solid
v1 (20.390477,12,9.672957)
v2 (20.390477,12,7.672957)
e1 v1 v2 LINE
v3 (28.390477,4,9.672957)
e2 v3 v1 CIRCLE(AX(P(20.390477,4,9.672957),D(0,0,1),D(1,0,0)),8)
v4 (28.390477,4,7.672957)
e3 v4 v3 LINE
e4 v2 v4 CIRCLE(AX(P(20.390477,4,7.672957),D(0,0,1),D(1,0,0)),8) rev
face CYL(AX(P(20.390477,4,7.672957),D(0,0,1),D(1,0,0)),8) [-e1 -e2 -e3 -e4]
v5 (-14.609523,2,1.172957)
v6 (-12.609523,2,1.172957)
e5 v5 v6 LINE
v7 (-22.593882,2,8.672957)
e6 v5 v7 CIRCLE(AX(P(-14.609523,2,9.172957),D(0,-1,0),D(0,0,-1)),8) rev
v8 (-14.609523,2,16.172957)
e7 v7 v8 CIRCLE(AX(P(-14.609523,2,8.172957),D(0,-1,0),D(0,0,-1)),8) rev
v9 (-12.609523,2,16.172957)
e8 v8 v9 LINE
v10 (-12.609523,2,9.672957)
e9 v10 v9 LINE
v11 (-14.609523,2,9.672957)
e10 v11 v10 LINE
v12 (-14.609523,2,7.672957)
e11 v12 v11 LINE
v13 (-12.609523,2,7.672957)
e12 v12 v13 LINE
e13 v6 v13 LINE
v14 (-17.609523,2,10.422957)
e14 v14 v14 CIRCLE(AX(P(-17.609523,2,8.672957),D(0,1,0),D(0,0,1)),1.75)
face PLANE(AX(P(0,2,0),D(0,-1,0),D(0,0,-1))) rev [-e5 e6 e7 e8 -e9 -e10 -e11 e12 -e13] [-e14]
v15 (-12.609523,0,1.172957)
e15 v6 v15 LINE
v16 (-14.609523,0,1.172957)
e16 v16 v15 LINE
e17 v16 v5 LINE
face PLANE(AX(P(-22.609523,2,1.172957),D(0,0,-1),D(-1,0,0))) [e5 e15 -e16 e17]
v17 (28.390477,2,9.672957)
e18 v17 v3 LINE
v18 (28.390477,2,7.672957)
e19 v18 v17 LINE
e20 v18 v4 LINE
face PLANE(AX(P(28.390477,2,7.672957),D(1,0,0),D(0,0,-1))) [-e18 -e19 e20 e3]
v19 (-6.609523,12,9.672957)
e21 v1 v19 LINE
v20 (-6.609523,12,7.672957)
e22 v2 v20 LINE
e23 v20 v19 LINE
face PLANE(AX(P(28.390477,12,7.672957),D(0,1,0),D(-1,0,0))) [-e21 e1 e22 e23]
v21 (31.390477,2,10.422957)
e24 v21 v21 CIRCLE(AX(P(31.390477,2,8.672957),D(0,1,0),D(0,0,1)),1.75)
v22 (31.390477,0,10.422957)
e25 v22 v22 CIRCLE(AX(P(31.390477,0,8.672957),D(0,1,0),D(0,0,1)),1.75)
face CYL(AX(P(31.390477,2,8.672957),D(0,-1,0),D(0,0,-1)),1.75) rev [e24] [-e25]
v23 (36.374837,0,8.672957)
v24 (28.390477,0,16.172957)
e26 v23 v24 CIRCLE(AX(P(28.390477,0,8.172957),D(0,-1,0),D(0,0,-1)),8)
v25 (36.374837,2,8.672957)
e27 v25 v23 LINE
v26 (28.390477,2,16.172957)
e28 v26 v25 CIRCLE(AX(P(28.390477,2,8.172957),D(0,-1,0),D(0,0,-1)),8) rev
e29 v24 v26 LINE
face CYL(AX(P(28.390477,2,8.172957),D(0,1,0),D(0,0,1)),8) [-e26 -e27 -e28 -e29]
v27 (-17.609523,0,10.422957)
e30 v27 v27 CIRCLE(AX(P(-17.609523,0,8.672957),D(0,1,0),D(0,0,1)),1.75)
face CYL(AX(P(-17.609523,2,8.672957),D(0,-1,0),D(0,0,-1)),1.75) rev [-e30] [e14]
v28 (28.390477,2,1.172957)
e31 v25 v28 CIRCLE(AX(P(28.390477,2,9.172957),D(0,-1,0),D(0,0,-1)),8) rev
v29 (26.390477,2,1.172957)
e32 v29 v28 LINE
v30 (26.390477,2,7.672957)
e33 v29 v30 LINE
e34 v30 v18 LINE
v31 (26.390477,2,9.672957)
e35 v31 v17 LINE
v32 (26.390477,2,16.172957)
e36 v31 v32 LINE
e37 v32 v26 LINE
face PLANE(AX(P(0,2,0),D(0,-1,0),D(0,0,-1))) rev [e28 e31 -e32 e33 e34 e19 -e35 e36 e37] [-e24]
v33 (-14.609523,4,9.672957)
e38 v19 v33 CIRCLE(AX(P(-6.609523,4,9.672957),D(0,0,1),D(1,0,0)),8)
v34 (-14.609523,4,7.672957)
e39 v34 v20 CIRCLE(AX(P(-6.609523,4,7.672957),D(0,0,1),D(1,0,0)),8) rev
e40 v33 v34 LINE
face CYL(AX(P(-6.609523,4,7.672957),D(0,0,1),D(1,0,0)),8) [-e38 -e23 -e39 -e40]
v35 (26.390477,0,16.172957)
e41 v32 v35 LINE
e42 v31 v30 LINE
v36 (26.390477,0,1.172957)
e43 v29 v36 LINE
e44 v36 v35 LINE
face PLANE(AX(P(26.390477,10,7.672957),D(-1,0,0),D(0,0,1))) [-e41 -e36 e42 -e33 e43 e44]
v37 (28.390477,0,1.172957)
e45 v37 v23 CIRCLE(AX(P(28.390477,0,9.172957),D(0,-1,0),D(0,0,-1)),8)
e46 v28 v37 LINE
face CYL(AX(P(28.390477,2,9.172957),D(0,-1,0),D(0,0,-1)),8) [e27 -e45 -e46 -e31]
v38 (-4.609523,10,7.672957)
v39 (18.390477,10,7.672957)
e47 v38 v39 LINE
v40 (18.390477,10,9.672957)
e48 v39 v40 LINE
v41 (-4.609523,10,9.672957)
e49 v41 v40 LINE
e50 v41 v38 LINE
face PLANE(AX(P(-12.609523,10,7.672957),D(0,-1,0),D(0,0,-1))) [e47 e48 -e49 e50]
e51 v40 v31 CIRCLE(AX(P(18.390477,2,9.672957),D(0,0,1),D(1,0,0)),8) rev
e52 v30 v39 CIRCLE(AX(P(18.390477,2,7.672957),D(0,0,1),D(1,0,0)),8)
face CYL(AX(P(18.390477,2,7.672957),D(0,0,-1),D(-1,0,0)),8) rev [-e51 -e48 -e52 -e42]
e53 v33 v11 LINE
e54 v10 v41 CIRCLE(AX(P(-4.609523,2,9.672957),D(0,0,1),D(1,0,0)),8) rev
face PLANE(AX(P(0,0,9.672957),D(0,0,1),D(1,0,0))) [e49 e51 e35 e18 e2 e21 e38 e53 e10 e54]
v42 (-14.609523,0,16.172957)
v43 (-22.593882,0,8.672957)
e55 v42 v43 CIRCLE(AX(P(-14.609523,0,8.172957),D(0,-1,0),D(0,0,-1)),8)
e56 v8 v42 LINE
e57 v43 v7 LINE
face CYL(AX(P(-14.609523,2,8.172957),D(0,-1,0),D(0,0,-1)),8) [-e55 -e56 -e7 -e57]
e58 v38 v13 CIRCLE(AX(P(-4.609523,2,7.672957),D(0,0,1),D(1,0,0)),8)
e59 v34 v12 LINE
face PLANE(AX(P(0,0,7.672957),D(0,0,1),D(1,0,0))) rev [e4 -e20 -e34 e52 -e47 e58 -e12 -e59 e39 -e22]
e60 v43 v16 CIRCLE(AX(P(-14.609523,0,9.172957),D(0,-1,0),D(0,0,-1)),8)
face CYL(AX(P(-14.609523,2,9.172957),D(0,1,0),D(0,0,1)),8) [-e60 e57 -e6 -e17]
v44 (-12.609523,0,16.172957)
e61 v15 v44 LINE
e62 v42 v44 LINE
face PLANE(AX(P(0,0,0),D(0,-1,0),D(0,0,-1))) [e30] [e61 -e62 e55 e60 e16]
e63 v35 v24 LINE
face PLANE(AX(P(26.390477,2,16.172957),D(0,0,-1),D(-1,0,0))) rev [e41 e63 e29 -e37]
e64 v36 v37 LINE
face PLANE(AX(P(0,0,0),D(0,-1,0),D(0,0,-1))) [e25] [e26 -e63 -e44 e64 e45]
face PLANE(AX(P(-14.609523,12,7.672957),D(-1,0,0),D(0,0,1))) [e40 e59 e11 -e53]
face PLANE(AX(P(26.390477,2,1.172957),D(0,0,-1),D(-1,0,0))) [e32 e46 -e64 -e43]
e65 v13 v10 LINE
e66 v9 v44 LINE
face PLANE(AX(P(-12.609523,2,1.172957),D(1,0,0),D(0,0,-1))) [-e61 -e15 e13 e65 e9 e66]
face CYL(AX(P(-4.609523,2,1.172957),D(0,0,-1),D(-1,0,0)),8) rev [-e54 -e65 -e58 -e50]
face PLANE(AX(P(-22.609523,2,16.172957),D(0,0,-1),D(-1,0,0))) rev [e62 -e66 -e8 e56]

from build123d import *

# Parameters (mm, degrees)
SKETCH3_W                = 10
SKETCH3_H                = 15
SKETCH3_R                = 1.75
BOSS_EXTRUDE1_DEPTH      = 2
BOSS_EXTRUDE1_2_DEPTH    = 2
BOSS_EXTRUDE2_DEPTH      = 1
BOSS_EXTRUDE2_DEPTH_BACK = 1
FILLET1_R                = 8


with BuildPart() as part:
    # Sketch3 → Boss-Extrude1 (new body)
    with BuildSketch(Plane(origin=(0, 0, 0), x_dir=(1, 0, 0), z_dir=(0, 1, 0))):
        with Locations((-17.609522653, -8.672957347)):
            Rectangle(SKETCH3_W, SKETCH3_H)
        with Locations(Location((-17.609522653, -8.672957347, 0), (0, 0, 270))):
            Circle(SKETCH3_R, mode=Mode.SUBTRACT)
    extrude(amount=BOSS_EXTRUDE1_DEPTH)



with BuildPart() as body_2:
    # Sketch3 → Boss-Extrude1 2 (new body)
    with BuildSketch(Plane(origin=(0, 0, 0), x_dir=(1, 0, 0), z_dir=(0, 1, 0))):
        with Locations((31.390477347, -8.672957347)):
            Rectangle(SKETCH3_W, SKETCH3_H)
        with Locations(Location((31.390477347, -8.672957347, 0), (0, 0, 270))):
            Circle(SKETCH3_R, mode=Mode.SUBTRACT)
    extrude(amount=BOSS_EXTRUDE1_2_DEPTH)


with BuildPart() as part_1:
    add(part.part)

    add(body_2.part)  # Boss-Extrude2 merges body 2
    # Sketch4 → Boss-Extrude2 (add, two sides: drawn at the far end of the back side and taken through both)
    with BuildSketch(Plane.XY.offset(8.672957347).offset(-BOSS_EXTRUDE2_DEPTH_BACK)):
        Polygon((-12.609522653, 2), (-12.609522653, 10), (26.390477347, 10), (26.390477347, 2), (28.390477347, 2), (28.390477347, 12), (-14.609522653, 12), (-14.609522653, 2), align=None)
    extrude(amount=BOSS_EXTRUDE2_DEPTH + BOSS_EXTRUDE2_DEPTH_BACK)

    # Fillet1
    # the kernel refuses this fillet: 8 mm, written as the material it adds along each edge
    with BuildSketch(Plane(origin=(26.390477347, 10, 7.672957347), x_dir=(0, -1, 0), z_dir=(0, 0, 1)), Plane(origin=(-12.609522653, 10, 7.672957347), x_dir=(1, 0, 0), z_dir=(0, 0, 1))) as fillet1_piece_1:
        with BuildLine():
            CenterArc((FILLET1_R, -FILLET1_R), FILLET1_R, 90, 90)
            Line((0, -FILLET1_R), (0, 0))
            Line((0, 0), (FILLET1_R, 0))
        make_face()
    extrude(amount=2)
    # the kernel refuses this fillet: 8 mm, written as the material it takes off along each edge
    with BuildSketch(Plane(origin=(-22.609522653, -20, 1.172957347), x_dir=(0, 0, 1), z_dir=(0, 1, 0)), Plane(origin=(36.390477347, -20, 1.172957347), x_dir=(-1, 0, 0), z_dir=(0, 1, 0)), Plane(origin=(36.390477347, -20, 16.172957347), x_dir=(0, 0, -1), z_dir=(0, 1, 0)), Plane(origin=(-14.609522653, 12, 29.672957347), x_dir=(1, 0, 0), z_dir=(0, 0, -1))) as fillet1_2_piece_1:
        with BuildLine():
            CenterArc((FILLET1_R, FILLET1_R), FILLET1_R, 180, 90)
            Line((0, FILLET1_R), (0, 0))
            Line((0, 0), (FILLET1_R, 0))
        make_face()
    extrude(amount=42, mode=Mode.SUBTRACT)
    with BuildSketch(Plane(origin=(-22.609522653, -20, 16.172957347), x_dir=(0, 0, -1), z_dir=(0, 1, 0)), Plane(origin=(28.390477347, 12, -12.327042653), x_dir=(0, -1, 0), z_dir=(0, 0, 1))) as fillet1_2_piece_2:
        with BuildLine():
            CenterArc((FILLET1_R, -FILLET1_R), FILLET1_R, 90, 90)
            Line((0, -FILLET1_R), (0, 0))
            Line((0, 0), (FILLET1_R, 0))
        make_face()
    extrude(amount=42, mode=Mode.SUBTRACT)


solid = part_1.part
